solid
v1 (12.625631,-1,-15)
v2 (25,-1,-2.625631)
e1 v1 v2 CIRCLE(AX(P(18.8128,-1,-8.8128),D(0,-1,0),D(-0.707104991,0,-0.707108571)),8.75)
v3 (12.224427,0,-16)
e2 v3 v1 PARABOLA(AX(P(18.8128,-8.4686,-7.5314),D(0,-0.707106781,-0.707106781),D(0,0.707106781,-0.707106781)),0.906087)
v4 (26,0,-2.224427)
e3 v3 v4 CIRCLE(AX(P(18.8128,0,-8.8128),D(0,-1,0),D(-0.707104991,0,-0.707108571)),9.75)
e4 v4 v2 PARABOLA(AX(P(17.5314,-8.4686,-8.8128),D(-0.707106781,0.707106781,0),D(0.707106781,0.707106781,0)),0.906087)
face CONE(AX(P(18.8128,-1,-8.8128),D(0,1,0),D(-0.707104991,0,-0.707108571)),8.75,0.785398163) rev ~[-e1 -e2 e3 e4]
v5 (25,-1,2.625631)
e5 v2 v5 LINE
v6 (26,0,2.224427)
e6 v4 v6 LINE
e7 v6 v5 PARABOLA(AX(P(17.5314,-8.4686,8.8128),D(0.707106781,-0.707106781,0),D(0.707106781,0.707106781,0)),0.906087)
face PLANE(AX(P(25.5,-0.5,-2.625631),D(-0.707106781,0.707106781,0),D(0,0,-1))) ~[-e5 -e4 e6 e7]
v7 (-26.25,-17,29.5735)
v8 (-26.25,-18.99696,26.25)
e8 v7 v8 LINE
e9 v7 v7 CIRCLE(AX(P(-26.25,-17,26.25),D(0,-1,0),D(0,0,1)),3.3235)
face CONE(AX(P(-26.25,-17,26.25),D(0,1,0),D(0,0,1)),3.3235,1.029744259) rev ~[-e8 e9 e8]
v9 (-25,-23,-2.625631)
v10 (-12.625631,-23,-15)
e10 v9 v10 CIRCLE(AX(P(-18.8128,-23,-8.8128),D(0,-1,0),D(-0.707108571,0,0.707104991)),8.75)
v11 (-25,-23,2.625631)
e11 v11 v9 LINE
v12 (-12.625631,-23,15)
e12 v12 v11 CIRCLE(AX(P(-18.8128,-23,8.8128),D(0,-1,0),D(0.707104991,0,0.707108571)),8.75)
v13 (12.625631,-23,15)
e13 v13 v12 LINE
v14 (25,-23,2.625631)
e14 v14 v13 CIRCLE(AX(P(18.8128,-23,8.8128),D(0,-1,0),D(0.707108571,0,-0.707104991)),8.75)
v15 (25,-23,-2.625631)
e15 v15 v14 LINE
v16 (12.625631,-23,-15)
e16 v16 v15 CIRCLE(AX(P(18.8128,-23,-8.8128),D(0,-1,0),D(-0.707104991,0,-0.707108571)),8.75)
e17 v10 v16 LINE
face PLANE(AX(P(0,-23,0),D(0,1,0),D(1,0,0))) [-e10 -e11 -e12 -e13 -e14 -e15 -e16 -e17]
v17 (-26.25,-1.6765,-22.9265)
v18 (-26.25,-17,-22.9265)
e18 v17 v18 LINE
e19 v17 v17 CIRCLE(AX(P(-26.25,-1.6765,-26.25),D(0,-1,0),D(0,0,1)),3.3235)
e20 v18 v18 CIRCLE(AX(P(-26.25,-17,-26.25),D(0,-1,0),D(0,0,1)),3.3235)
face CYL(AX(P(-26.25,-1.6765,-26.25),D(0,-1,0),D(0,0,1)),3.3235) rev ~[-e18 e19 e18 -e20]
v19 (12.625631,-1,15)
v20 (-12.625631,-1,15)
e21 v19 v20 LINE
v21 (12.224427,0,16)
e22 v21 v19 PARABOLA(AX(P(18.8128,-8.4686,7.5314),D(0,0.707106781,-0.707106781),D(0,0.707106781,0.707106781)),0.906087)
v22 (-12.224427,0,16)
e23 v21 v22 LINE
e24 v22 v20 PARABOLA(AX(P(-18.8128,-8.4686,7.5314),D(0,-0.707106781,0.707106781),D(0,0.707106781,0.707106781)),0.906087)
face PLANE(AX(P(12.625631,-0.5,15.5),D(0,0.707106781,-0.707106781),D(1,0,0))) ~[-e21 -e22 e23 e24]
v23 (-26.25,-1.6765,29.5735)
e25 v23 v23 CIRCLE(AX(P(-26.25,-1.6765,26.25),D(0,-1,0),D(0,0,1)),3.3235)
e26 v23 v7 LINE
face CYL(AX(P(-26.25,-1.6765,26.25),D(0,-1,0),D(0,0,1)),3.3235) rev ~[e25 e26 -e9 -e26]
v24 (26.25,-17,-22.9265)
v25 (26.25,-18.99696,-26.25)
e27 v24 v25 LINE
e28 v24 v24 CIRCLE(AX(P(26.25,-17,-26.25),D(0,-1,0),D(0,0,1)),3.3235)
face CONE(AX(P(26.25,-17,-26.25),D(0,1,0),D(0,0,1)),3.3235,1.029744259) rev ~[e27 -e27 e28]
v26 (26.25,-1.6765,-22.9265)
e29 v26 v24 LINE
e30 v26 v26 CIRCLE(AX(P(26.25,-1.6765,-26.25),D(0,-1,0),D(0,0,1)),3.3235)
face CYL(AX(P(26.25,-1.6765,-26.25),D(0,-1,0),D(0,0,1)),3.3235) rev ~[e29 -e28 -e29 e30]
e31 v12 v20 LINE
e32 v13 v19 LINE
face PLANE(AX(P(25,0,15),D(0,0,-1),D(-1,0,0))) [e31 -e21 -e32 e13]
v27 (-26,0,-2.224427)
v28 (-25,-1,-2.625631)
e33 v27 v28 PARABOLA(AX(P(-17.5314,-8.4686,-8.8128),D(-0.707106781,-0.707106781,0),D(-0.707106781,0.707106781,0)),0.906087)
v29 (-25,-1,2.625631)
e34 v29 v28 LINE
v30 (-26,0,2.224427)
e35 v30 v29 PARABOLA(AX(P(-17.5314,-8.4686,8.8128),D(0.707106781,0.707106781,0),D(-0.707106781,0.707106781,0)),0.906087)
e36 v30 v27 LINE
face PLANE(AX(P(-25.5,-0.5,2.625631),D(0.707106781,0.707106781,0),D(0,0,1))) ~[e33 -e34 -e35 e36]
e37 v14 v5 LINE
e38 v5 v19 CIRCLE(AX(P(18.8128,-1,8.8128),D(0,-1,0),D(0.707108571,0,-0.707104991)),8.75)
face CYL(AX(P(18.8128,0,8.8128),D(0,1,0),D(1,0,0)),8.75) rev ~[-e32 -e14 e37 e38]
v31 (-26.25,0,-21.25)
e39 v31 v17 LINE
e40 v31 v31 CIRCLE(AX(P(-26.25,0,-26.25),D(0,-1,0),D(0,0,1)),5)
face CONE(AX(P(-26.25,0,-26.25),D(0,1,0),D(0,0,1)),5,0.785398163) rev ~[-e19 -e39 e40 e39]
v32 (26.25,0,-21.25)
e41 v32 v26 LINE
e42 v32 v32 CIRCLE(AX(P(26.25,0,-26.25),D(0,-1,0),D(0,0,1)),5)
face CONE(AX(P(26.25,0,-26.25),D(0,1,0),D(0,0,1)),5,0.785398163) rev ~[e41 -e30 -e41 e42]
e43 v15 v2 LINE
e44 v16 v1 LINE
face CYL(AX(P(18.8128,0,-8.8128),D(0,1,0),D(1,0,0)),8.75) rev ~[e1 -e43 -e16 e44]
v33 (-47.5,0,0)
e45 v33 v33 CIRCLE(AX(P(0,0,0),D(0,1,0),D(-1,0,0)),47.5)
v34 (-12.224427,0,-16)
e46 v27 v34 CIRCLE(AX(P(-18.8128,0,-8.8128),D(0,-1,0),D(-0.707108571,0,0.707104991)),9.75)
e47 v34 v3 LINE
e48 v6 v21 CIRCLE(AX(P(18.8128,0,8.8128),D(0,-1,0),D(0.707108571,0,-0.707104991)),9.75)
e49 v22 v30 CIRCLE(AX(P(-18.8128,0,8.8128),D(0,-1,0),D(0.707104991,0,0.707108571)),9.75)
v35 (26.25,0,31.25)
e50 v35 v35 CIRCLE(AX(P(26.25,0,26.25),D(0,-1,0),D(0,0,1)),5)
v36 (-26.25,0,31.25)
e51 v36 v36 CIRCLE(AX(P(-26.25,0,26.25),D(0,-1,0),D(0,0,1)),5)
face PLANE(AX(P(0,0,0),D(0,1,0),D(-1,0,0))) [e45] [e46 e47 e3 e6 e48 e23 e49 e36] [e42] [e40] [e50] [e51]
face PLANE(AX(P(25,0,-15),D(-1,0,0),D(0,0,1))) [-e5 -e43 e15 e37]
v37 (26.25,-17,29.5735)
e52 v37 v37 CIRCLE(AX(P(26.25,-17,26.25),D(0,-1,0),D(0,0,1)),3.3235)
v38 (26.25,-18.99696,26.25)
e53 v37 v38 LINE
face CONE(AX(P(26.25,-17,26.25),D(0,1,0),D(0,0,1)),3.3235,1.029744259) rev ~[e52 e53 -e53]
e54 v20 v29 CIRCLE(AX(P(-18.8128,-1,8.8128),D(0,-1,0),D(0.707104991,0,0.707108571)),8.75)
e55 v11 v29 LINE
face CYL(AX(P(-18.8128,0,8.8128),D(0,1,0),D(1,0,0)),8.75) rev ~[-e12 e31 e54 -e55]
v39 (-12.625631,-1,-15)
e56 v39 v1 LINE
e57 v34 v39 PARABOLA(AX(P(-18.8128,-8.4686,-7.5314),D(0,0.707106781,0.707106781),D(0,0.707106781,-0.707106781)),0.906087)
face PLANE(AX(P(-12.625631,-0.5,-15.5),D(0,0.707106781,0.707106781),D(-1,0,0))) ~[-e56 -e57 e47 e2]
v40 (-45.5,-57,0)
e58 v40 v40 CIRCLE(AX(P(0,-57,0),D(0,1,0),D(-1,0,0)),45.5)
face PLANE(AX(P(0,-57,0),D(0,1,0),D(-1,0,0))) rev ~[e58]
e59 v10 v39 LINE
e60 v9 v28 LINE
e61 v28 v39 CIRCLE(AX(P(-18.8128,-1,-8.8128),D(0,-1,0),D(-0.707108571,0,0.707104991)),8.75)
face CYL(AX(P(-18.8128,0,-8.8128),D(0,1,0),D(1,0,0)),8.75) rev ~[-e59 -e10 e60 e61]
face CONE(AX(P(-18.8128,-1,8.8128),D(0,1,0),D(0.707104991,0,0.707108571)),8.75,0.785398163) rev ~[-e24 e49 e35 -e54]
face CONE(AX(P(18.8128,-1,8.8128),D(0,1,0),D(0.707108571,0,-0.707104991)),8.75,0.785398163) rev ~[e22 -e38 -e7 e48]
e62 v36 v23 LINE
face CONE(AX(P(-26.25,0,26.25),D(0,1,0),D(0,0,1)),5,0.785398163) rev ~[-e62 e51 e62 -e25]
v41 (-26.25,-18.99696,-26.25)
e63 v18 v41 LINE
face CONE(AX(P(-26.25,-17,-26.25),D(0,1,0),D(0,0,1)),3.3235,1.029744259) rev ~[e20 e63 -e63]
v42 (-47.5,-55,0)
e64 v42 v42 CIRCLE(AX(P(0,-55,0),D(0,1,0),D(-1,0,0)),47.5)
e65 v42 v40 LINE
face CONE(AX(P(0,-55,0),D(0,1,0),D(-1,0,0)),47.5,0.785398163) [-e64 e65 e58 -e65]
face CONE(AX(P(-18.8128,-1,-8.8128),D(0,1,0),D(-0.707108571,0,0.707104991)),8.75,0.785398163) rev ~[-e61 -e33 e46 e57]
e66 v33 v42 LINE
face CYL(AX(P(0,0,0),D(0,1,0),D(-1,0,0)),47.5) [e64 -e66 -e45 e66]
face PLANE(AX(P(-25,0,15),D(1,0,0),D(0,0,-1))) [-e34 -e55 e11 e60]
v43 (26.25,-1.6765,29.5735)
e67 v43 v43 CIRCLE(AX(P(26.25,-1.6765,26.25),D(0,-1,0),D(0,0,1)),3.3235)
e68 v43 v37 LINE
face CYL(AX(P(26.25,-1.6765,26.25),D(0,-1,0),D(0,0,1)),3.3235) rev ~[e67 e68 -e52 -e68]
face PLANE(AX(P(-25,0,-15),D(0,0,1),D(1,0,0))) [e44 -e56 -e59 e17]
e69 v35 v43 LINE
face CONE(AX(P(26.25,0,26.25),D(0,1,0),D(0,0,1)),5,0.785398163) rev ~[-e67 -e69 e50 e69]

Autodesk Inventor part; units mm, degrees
ref_plane "YZ Plane" through (0, 0, 0) normal (1, 0, 0) x (0, 1, 0)
ref_plane "XZ Plane" through (0, 0, 0) normal (0, 1, 0) x (-1, 0, 0)
ref_plane "XY Plane" through (0, 0, 0) normal (0, 0, 1) x (1, 0, 0)
sketch "Sketch1" plane through (0, 0, 0) normal (0, 1, 0) x (-1, 0, 0)
  circle A0 centre (0, 0) radius 47.5
  line L0 (-25, 15) -> (25, 15)
  line L1 (25, 15) -> (25, -15)
  line L2 (25, -15) -> (-25, -15)
  line L3 (-25, -15) -> (-25, 15)
  line L4 (-25, 15) -> (25, -15) construction
  line L5 (25, 15) -> (-25, -15) construction
  line L6 (-26.25, 26.25) -> (26.25, 26.25) construction
  line L7 (26.25, 26.25) -> (26.25, -26.25) construction
  line L8 (26.25, -26.25) -> (-26.25, -26.25) construction
  line L9 (-26.25, -26.25) -> (-26.25, 26.25) construction
  line L10 (-26.25, 26.25) -> (26.25, -26.25) construction
  line L11 (26.25, 26.25) -> (-26.25, -26.25) construction
  dimension "d0" = 30
  dimension "d2" = 95
  dimension "holeL" = 52.5
  dimension "d27" = 50
extrude "Extrusion1" add sketch "Sketch1" against normal blind 57 contours A0 | L0 L1 L2 L3
extrude "Extrusion2" cut sketch "Sketch1" against normal blind 23 contours L0 L1 L2 L3
sketch "Sketch3" plane through (0, 0, 0) normal (0, 1, 0) x (1, 0, 0)
  line L0 (-25, -15) -> (-25, 15) construction
  line L1 (-25, 15) -> (25, 15) construction
  line L2 (25, 15) -> (25, -15) construction
  line L3 (25, -15) -> (-25, -15) construction
  circle A0 centre (0, 0) radius 47.5 construction
  circle A1 centre (18.8128, 8.8128) radius 8.75
  line L4 (18.8128, 8.8128) -> (25, 15) construction
  line L5 (-66.5, 0) -> (66.5, 0) construction
  line L6 (0, 66.5) -> (0, -66.5) construction
  circle A2 centre (18.8128, -8.8128) radius 8.75
  circle A3 centre (-18.8128, 8.8128) radius 8.75
  circle A4 centre (-18.8128, -8.8128) radius 8.75
  dimension "d34" = 17.5
  dimension "d33" = 45
extrude "Extrusion3" cut sketch "Sketch3" against normal up to surface (23 mm away)
hole "Hole1" at (-26.25, 0, -26.25) at (26.25, 0, -26.25) at (26.25, 0, 26.25) at (-26.25, 0, 26.25) direction (0, -1, 0) diameter 6.647 depth 17 tip angle 118 countersink diameter 10 countersink angle 90 thread size "M8x1.25" class "6H" standard "ISO Metric profile"
chamfer "Chamfer1" distance 1 angle 45 8 edges at (0, 0, -15) (25, 0, 0) (0, 0, 15) (-25, 0, 0) (-25, 0, -15) (-25, 0, 15) (25, 0, -15) (25, 0, 15)
chamfer "Chamfer2" distance 2 angle 45 1 edges at (47.5, -57, 0)
sketch "Sketch2" plane through (0, -57, 0) normal (0, -1, 0) x (1, 0, 0)
  circle A0 centre (0, 0) radius 15 construction
  circle A1 centre (0, 0) radius 19 construction
  dimension "d23" = 4
  dimension "d24" = 30
mark "Mark1"
properties part number "HM1_FIXT1-001"
